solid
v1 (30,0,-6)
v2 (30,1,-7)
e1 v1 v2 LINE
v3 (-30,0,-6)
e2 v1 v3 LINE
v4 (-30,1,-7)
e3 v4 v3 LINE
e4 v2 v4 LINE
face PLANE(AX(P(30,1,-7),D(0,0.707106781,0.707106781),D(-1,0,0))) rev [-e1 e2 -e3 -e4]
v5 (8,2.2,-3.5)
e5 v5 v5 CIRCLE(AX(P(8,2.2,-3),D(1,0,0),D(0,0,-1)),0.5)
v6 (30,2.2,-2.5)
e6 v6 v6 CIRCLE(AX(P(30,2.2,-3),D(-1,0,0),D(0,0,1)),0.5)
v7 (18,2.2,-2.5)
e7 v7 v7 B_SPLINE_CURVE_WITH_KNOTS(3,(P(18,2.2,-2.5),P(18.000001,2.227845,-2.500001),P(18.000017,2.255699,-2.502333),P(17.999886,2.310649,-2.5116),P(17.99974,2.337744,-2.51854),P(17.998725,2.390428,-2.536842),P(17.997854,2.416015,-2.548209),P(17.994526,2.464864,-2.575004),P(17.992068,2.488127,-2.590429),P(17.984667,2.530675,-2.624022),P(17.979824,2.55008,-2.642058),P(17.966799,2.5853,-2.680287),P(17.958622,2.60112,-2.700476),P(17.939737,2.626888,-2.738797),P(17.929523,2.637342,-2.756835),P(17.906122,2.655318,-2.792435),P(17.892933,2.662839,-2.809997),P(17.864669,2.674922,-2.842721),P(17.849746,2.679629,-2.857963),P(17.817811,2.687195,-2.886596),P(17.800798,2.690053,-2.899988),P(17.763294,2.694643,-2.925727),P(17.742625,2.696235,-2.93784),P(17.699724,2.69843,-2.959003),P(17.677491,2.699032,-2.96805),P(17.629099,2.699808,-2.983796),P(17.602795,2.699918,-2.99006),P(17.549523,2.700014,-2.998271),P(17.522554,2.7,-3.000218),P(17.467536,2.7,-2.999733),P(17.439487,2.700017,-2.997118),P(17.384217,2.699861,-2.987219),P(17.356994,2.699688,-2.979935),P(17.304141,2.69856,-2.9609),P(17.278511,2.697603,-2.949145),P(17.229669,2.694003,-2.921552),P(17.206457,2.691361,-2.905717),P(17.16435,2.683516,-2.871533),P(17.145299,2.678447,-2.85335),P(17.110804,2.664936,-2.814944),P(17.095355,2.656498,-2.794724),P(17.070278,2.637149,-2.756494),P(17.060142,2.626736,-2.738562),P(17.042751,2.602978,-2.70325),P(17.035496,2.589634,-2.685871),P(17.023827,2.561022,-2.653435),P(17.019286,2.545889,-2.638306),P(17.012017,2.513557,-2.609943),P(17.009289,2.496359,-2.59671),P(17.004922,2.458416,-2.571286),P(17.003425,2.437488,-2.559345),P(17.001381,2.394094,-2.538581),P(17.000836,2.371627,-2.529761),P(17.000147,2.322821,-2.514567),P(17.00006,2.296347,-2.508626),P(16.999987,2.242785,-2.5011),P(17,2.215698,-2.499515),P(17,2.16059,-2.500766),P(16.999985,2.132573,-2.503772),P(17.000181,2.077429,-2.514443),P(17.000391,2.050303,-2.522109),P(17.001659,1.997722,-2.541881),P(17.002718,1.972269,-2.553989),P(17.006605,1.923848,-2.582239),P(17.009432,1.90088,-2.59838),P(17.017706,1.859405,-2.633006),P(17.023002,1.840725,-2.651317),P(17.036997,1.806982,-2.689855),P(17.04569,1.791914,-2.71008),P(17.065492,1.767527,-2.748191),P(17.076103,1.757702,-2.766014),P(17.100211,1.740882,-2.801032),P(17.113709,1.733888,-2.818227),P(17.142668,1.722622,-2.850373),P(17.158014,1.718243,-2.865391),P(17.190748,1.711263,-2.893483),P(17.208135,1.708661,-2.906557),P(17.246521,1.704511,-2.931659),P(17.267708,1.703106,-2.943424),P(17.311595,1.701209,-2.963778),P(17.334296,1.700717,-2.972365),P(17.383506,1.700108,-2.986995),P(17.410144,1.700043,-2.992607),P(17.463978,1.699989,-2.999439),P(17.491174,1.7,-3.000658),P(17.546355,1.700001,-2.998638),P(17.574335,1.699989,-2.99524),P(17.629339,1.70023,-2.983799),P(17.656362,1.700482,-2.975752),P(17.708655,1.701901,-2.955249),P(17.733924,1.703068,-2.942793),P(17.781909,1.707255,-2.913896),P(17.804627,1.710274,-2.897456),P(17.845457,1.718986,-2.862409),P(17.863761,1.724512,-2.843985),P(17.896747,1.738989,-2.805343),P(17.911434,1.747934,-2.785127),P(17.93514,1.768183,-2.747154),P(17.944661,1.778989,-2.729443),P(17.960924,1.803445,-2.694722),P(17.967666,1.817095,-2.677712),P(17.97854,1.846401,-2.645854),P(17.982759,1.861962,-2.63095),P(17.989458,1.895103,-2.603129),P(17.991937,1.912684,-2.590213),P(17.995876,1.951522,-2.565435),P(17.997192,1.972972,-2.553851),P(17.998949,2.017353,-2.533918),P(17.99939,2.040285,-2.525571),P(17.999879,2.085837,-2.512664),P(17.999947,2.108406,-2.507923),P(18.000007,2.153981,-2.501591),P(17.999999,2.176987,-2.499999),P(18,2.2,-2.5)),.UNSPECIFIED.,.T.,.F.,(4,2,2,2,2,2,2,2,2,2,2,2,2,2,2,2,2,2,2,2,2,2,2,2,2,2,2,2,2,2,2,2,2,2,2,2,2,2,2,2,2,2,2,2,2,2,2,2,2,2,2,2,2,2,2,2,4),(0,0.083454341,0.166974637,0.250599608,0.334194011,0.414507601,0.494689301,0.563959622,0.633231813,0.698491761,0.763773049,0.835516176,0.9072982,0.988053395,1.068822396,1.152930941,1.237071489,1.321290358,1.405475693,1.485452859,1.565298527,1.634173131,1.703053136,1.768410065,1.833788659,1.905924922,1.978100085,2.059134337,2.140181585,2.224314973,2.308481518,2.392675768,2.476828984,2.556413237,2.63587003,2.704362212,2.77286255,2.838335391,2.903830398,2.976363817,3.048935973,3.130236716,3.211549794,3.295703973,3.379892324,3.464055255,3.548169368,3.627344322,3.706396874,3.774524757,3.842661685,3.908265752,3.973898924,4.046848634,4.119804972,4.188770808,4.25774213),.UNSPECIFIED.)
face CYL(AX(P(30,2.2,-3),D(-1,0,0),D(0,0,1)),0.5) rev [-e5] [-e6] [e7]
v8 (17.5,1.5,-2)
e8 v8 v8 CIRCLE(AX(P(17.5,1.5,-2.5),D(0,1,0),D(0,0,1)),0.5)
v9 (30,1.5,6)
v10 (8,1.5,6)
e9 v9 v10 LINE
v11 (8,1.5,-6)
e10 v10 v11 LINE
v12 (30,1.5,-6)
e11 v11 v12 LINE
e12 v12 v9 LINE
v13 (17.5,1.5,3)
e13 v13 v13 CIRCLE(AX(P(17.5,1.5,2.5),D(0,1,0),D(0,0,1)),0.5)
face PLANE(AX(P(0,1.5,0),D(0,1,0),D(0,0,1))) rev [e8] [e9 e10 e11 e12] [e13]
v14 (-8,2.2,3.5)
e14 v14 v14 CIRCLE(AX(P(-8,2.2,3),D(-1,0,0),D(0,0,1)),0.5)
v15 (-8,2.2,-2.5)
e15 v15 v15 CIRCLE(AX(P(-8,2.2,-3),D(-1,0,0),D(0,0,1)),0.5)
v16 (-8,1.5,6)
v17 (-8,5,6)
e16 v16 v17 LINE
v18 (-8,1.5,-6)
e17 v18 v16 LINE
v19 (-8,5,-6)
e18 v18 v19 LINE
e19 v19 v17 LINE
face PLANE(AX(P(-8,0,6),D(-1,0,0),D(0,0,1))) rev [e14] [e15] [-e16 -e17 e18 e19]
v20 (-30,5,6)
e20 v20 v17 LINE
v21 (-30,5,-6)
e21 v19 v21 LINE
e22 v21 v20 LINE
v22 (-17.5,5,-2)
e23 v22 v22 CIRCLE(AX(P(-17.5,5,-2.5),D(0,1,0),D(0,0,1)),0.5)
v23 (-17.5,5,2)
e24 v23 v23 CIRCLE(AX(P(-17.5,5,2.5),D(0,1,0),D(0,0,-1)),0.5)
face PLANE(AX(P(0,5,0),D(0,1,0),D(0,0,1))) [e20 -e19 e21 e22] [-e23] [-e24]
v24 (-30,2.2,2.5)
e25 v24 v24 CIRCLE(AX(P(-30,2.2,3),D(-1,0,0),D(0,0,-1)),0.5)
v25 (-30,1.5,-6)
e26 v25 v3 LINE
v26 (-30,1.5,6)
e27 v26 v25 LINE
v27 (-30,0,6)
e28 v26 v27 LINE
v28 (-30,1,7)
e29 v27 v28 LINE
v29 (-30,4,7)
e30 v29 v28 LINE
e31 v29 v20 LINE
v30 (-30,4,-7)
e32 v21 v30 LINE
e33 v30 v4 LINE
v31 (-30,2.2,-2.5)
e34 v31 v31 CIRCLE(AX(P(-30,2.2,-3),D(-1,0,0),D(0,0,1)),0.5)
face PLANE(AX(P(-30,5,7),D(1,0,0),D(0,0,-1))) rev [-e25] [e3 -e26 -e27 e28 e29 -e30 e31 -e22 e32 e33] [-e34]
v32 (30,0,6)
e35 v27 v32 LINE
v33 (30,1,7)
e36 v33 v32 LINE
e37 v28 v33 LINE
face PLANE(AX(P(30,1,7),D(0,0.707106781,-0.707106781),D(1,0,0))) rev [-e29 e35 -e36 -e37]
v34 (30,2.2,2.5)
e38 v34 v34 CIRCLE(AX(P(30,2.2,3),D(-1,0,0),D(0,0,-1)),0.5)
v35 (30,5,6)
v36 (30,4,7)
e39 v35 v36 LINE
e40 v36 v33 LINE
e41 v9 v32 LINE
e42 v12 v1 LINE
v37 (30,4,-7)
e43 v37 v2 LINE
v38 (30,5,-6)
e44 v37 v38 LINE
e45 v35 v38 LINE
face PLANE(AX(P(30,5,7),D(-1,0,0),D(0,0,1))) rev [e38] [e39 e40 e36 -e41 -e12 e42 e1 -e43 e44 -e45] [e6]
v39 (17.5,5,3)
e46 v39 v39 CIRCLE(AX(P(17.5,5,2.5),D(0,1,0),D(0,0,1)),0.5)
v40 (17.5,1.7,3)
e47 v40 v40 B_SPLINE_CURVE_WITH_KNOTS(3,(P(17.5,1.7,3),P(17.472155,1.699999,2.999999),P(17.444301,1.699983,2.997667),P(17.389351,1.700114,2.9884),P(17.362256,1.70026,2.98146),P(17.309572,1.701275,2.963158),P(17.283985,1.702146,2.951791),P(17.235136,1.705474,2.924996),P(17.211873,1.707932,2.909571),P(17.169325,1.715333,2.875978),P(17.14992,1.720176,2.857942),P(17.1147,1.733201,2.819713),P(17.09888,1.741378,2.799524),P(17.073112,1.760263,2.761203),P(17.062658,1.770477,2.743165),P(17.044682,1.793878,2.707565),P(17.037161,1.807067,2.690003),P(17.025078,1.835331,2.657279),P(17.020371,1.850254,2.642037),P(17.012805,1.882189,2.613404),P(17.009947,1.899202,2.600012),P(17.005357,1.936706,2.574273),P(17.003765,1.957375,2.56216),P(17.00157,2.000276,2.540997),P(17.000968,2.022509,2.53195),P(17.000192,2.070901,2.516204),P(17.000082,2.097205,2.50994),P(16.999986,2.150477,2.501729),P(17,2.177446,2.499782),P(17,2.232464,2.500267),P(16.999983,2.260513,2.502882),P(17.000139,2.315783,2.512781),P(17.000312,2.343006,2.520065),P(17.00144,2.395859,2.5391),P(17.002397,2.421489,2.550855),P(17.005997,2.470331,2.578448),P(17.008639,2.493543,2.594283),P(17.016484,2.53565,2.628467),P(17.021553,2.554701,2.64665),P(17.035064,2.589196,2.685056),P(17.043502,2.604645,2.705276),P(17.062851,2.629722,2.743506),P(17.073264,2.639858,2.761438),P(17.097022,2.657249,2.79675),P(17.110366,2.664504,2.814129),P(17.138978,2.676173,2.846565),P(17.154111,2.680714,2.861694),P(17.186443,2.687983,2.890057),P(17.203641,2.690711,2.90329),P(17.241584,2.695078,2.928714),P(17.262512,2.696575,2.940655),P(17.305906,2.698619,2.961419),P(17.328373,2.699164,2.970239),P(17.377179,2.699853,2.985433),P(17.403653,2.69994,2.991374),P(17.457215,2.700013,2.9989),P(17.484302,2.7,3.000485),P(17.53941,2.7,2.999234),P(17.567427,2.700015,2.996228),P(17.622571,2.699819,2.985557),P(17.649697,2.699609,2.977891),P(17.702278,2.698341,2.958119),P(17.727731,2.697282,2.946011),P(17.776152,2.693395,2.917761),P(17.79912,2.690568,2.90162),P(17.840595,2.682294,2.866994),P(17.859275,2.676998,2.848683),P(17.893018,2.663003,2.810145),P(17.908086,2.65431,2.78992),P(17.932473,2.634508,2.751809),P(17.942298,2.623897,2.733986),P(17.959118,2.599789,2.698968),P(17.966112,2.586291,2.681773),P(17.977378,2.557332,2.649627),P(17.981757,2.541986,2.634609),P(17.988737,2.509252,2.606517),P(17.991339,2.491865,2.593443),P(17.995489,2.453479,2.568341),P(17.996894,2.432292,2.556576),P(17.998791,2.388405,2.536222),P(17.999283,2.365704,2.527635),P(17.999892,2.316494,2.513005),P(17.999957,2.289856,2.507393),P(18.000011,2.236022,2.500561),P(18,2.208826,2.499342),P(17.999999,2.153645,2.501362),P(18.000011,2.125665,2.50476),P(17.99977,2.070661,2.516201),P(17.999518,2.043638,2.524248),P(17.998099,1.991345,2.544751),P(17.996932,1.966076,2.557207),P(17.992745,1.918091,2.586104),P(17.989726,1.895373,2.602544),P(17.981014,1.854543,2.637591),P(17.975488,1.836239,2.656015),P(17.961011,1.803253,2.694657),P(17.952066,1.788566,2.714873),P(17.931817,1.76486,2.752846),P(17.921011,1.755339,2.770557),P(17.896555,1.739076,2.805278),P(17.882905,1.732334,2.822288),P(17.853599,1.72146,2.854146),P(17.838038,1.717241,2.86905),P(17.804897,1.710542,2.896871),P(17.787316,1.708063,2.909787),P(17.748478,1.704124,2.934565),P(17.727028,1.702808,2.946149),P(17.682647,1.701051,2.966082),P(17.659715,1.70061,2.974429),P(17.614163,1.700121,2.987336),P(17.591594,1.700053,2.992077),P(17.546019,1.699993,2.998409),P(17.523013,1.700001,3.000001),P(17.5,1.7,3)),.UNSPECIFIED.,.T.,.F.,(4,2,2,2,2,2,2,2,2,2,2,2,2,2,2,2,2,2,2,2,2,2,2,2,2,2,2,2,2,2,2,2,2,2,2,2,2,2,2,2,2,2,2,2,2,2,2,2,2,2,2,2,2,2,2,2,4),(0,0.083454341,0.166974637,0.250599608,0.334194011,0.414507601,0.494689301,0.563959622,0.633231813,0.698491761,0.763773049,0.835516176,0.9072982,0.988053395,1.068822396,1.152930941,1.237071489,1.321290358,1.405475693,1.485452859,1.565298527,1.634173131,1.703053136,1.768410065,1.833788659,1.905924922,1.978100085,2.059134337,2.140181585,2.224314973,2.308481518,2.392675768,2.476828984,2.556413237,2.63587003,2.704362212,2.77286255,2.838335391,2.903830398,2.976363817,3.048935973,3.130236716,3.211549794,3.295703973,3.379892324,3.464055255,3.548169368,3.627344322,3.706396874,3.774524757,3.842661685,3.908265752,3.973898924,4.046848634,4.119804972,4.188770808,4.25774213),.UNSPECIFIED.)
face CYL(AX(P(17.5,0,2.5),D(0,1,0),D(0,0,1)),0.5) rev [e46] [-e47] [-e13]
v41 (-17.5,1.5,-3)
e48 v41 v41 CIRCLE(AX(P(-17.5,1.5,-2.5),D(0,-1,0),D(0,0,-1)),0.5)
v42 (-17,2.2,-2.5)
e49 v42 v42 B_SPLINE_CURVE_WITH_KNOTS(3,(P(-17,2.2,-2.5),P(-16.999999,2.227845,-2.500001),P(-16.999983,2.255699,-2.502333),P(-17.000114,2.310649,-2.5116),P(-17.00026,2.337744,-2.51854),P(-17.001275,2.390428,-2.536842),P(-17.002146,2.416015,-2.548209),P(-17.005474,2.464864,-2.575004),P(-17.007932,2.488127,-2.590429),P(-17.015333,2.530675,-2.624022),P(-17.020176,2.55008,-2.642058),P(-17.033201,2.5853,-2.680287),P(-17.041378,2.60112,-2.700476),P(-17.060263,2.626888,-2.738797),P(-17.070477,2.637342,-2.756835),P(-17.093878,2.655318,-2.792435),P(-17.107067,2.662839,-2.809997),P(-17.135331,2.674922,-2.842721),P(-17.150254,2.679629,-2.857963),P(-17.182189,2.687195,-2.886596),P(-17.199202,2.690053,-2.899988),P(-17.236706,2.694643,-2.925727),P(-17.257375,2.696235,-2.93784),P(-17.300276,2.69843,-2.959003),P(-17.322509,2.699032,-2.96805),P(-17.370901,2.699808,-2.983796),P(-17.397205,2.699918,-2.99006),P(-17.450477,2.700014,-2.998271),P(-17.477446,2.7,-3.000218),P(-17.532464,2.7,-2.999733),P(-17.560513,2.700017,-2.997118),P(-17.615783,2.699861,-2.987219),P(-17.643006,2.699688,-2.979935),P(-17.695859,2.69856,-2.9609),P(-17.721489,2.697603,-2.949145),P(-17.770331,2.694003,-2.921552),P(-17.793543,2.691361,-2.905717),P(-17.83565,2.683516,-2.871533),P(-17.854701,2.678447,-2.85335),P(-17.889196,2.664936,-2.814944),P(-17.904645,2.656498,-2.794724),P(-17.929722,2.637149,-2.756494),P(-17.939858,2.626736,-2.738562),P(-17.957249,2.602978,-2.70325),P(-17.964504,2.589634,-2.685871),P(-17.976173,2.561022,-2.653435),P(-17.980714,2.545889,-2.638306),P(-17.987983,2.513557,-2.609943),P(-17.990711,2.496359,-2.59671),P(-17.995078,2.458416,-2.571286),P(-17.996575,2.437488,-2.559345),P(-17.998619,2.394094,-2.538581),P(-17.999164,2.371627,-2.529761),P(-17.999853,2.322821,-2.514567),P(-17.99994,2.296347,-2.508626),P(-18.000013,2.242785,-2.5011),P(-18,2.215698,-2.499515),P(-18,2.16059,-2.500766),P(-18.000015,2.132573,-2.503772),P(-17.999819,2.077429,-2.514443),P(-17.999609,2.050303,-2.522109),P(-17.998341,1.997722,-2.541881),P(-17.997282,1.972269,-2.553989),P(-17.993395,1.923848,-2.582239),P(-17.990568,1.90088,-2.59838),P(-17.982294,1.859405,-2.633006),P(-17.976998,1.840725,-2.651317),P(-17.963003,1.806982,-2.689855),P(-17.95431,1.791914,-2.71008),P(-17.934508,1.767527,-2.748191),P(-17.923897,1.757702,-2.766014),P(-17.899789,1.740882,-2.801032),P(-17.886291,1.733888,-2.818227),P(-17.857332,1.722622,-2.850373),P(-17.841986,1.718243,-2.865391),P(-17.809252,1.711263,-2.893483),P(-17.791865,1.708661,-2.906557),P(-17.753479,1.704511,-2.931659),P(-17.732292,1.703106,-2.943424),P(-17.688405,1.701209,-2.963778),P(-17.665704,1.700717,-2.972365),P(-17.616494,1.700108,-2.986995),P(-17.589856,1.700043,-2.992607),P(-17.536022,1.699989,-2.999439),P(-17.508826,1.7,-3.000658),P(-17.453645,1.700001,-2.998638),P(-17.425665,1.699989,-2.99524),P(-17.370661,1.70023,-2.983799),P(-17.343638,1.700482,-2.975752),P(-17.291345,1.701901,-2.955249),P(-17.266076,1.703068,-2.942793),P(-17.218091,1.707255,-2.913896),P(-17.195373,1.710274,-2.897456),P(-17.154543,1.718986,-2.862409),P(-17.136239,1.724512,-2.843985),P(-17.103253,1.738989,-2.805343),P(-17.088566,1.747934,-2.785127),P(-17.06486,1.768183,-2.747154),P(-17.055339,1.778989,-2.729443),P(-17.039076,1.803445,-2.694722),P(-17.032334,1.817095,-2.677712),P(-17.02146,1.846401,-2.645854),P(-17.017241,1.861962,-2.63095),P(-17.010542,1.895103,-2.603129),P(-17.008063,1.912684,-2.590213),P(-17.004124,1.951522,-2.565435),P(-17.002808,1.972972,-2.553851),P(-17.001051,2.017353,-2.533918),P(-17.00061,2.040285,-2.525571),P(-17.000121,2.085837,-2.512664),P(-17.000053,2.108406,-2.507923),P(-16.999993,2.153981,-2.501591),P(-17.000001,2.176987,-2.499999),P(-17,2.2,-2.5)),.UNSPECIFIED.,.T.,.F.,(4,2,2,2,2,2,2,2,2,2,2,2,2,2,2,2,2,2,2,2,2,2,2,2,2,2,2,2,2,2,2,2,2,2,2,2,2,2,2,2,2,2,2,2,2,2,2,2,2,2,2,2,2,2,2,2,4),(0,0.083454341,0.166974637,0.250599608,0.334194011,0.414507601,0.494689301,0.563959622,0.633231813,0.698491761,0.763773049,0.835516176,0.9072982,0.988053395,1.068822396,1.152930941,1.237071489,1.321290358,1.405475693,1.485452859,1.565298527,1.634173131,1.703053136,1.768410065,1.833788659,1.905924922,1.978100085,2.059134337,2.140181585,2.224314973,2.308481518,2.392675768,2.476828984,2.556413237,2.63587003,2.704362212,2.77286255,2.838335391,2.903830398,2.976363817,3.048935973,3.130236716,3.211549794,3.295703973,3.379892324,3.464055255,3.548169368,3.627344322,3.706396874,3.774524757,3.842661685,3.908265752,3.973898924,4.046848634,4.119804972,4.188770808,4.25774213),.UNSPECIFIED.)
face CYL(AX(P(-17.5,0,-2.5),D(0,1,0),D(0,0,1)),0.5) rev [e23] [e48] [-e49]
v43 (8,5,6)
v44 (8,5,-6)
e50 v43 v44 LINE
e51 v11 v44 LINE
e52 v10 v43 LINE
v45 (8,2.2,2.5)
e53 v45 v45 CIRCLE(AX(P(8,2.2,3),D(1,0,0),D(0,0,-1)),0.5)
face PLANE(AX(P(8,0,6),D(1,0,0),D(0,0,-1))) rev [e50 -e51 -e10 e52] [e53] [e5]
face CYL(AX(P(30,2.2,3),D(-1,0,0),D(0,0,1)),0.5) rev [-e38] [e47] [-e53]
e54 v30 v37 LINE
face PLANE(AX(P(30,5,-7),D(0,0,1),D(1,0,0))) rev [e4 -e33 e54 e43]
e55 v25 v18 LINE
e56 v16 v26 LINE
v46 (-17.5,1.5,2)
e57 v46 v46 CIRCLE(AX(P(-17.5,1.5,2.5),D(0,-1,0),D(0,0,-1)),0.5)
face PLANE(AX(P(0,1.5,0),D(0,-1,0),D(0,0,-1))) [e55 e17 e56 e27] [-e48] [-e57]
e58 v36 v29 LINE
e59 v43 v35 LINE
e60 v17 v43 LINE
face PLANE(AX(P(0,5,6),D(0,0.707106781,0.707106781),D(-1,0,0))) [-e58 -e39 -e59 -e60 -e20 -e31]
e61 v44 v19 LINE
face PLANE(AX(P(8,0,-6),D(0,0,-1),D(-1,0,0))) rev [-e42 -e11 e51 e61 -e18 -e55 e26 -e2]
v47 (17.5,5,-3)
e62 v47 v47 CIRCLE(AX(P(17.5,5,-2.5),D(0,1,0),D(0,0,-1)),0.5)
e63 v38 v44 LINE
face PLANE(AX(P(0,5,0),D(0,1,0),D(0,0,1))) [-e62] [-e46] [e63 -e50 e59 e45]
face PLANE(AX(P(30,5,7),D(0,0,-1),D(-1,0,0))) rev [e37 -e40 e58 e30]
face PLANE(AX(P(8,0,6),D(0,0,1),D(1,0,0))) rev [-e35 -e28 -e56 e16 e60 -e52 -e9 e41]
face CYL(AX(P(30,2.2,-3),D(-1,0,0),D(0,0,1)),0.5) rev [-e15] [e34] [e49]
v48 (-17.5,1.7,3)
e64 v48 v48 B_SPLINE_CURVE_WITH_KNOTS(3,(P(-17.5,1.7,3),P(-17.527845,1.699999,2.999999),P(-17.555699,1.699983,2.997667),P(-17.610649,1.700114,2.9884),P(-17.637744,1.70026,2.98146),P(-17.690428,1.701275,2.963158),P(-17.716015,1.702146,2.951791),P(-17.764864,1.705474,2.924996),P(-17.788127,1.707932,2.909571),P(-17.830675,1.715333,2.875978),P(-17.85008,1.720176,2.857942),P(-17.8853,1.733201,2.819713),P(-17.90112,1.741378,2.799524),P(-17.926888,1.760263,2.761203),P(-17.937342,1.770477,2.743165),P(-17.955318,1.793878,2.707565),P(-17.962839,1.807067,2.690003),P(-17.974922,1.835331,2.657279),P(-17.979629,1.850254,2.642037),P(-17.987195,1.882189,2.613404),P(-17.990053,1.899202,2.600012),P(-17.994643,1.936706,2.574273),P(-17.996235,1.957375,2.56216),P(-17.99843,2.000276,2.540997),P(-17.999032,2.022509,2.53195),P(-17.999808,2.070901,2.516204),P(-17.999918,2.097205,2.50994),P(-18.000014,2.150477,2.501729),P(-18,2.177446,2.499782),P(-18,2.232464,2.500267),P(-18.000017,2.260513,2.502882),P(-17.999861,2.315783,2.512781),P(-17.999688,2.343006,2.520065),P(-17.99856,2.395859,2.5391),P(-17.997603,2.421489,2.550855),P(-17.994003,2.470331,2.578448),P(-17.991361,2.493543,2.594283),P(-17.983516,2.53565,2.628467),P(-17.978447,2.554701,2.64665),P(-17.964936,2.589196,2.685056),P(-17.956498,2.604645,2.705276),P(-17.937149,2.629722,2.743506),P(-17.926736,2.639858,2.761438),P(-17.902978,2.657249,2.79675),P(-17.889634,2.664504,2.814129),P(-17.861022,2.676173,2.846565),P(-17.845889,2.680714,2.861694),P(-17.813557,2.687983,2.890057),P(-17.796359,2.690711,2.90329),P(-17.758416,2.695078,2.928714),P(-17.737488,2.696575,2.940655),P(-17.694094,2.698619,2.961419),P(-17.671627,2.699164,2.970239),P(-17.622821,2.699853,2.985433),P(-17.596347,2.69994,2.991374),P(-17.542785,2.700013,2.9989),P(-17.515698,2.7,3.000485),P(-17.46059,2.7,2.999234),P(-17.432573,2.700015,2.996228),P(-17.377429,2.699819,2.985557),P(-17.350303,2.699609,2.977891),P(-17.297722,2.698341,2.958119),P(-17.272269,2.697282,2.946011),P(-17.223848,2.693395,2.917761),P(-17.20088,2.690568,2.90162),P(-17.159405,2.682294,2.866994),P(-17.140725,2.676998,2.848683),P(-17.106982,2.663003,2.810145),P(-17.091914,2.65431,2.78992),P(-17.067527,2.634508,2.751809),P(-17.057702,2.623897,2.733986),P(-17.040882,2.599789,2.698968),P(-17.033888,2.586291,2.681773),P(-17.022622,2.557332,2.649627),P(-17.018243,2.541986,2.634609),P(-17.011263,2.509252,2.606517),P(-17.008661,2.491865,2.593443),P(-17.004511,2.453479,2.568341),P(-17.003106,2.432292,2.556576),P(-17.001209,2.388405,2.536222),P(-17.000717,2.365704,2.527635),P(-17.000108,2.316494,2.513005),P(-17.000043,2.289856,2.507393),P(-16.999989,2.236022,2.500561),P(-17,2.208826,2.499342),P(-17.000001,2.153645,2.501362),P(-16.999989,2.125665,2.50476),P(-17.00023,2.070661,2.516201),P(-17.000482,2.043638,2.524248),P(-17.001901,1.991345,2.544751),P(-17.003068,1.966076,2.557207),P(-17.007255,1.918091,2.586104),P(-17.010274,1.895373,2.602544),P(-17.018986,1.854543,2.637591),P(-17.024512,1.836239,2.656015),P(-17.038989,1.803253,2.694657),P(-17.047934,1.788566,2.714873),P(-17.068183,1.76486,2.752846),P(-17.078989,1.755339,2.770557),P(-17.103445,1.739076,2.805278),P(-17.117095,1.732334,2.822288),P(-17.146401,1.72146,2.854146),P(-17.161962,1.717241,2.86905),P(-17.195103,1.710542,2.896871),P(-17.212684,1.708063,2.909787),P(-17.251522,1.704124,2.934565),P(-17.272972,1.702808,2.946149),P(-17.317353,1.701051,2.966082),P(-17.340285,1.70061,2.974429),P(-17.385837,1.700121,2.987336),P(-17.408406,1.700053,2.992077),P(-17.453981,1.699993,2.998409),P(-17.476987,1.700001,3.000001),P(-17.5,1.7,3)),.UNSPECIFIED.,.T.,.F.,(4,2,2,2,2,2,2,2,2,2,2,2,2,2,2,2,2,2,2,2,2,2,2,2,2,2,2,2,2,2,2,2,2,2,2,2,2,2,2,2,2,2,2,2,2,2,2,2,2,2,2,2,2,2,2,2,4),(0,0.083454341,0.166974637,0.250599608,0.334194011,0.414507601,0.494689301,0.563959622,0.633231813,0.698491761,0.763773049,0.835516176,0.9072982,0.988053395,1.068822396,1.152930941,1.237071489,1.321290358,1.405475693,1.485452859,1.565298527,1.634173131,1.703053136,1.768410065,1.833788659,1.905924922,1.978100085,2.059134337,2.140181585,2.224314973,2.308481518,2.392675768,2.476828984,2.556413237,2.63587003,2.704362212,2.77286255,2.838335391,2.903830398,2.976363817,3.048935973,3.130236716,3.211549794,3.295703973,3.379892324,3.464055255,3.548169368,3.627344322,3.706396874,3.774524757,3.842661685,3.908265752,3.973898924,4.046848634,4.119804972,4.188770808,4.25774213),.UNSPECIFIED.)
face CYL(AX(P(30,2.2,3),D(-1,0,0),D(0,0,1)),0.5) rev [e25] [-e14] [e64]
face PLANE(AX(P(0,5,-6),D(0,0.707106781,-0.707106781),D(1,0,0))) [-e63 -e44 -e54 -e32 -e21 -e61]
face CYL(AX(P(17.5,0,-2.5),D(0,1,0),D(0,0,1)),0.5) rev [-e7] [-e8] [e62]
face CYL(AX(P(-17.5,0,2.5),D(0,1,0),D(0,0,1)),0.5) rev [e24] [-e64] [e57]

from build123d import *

# Parameters (mm, degrees)
SKETCH_1_W          = 60
SKETCH_1_H          = 14
EXTRUDE_1_DEPTH     = 5
SKETCH_2_W          = 16
SKETCH_2_H          = 12
CUT_EXTRUDE_1_DEPTH = 32.208973069
SKETCH_3_R          = 0.5
CUT_EXTRUDE_2_DEPTH = 61.613529843
SKETCH_4_W          = 22
SKETCH_4_H          = 12
CUT_EXTRUDE_3_DEPTH = 1.5
CHAMFER_1_SIZE      = 1
CHAMFER_2_SIZE      = 1
CHAMFER_3_SIZE      = 1
SKETCH_5_R          = 0.5
CUT_EXTRUDE_4_DEPTH = 32.208973069


with BuildPart() as part:
    # 草图1 → 凸台-拉伸1 (new body)
    with BuildSketch(Plane(origin=(0, 0, 0), x_dir=(1, 0, 0), z_dir=(0, 1, 0))):
        Rectangle(SKETCH_1_W, SKETCH_1_H)
    extrude(amount=EXTRUDE_1_DEPTH)

    # 草图2 → 切除-拉伸1 (cut, through all)
    with BuildSketch(Plane(origin=(0, 5, 0), x_dir=(1, 0, 0), z_dir=(0, 1, 0))):
        Rectangle(SKETCH_2_W, SKETCH_2_H)
    extrude(amount=-CUT_EXTRUDE_1_DEPTH, mode=Mode.SUBTRACT)

    # 草图3 → 切除-拉伸2 (cut, through all)
    with BuildSketch(Plane.ZY.offset(30)):
        with Locations((-3, 2.2)):
            Circle(SKETCH_3_R)
        with Locations(Location((3, 2.2, 0), (0, 0, 180))):
            Circle(SKETCH_3_R)
    extrude(amount=-CUT_EXTRUDE_2_DEPTH, mode=Mode.SUBTRACT)

    # 草图4 → 切除-拉伸3 (cut)
    with BuildSketch(Plane.XZ):
        with Locations((-19, 0)):
            Rectangle(SKETCH_4_W, SKETCH_4_H)
        with Locations((19, 0)):
            Rectangle(SKETCH_4_W, SKETCH_4_H)
    extrude(amount=-CUT_EXTRUDE_3_DEPTH, mode=Mode.SUBTRACT)

    # 倒角1
    chamfer_1_edges = [part.edges().sort_by_distance(p)[0] for p in [
        (0, 5, -7),
        (0, 5, 7),
    ]]
    chamfer(chamfer_1_edges, length=CHAMFER_1_SIZE - 0.0001)  # a hair under: the kernel refuses the full size

    # 倒角2
    chamfer_2_edges = [part.edges().sort_by_distance(p)[0] for p in [
        (0, 0, 7),
    ]]
    chamfer(chamfer_2_edges, length=CHAMFER_2_SIZE - 0.0001)  # a hair under: the kernel refuses the full size

    # 倒角3
    chamfer_3_edges = [part.edges().sort_by_distance(p)[0] for p in [
        (0, 0, -7),
    ]]
    chamfer(chamfer_3_edges, length=CHAMFER_3_SIZE - 0.0001)  # a hair under: the kernel refuses the full size

    # 草图5 → 切除-拉伸4 (cut, through all)
    with BuildSketch(Plane(origin=(0, 5, 0), x_dir=(1, 0, 0), z_dir=(0, 1, 0))):
        with Locations(Location((-17.5, 2.5, 0), (0, 0, 270))):
            Circle(SKETCH_5_R)
        with Locations(Location((17.5, 2.5, 0), (0, 0, 270))):
            Circle(SKETCH_5_R)
        with Locations(Location((17.5, -2.5, 0), (0, 0, 270))):
            Circle(SKETCH_5_R)
        with Locations(Location((-17.5, -2.5, 0), (0, 0, 90))):
            Circle(SKETCH_5_R)
    extrude(amount=-CUT_EXTRUDE_4_DEPTH, mode=Mode.SUBTRACT)


solid = part.part
